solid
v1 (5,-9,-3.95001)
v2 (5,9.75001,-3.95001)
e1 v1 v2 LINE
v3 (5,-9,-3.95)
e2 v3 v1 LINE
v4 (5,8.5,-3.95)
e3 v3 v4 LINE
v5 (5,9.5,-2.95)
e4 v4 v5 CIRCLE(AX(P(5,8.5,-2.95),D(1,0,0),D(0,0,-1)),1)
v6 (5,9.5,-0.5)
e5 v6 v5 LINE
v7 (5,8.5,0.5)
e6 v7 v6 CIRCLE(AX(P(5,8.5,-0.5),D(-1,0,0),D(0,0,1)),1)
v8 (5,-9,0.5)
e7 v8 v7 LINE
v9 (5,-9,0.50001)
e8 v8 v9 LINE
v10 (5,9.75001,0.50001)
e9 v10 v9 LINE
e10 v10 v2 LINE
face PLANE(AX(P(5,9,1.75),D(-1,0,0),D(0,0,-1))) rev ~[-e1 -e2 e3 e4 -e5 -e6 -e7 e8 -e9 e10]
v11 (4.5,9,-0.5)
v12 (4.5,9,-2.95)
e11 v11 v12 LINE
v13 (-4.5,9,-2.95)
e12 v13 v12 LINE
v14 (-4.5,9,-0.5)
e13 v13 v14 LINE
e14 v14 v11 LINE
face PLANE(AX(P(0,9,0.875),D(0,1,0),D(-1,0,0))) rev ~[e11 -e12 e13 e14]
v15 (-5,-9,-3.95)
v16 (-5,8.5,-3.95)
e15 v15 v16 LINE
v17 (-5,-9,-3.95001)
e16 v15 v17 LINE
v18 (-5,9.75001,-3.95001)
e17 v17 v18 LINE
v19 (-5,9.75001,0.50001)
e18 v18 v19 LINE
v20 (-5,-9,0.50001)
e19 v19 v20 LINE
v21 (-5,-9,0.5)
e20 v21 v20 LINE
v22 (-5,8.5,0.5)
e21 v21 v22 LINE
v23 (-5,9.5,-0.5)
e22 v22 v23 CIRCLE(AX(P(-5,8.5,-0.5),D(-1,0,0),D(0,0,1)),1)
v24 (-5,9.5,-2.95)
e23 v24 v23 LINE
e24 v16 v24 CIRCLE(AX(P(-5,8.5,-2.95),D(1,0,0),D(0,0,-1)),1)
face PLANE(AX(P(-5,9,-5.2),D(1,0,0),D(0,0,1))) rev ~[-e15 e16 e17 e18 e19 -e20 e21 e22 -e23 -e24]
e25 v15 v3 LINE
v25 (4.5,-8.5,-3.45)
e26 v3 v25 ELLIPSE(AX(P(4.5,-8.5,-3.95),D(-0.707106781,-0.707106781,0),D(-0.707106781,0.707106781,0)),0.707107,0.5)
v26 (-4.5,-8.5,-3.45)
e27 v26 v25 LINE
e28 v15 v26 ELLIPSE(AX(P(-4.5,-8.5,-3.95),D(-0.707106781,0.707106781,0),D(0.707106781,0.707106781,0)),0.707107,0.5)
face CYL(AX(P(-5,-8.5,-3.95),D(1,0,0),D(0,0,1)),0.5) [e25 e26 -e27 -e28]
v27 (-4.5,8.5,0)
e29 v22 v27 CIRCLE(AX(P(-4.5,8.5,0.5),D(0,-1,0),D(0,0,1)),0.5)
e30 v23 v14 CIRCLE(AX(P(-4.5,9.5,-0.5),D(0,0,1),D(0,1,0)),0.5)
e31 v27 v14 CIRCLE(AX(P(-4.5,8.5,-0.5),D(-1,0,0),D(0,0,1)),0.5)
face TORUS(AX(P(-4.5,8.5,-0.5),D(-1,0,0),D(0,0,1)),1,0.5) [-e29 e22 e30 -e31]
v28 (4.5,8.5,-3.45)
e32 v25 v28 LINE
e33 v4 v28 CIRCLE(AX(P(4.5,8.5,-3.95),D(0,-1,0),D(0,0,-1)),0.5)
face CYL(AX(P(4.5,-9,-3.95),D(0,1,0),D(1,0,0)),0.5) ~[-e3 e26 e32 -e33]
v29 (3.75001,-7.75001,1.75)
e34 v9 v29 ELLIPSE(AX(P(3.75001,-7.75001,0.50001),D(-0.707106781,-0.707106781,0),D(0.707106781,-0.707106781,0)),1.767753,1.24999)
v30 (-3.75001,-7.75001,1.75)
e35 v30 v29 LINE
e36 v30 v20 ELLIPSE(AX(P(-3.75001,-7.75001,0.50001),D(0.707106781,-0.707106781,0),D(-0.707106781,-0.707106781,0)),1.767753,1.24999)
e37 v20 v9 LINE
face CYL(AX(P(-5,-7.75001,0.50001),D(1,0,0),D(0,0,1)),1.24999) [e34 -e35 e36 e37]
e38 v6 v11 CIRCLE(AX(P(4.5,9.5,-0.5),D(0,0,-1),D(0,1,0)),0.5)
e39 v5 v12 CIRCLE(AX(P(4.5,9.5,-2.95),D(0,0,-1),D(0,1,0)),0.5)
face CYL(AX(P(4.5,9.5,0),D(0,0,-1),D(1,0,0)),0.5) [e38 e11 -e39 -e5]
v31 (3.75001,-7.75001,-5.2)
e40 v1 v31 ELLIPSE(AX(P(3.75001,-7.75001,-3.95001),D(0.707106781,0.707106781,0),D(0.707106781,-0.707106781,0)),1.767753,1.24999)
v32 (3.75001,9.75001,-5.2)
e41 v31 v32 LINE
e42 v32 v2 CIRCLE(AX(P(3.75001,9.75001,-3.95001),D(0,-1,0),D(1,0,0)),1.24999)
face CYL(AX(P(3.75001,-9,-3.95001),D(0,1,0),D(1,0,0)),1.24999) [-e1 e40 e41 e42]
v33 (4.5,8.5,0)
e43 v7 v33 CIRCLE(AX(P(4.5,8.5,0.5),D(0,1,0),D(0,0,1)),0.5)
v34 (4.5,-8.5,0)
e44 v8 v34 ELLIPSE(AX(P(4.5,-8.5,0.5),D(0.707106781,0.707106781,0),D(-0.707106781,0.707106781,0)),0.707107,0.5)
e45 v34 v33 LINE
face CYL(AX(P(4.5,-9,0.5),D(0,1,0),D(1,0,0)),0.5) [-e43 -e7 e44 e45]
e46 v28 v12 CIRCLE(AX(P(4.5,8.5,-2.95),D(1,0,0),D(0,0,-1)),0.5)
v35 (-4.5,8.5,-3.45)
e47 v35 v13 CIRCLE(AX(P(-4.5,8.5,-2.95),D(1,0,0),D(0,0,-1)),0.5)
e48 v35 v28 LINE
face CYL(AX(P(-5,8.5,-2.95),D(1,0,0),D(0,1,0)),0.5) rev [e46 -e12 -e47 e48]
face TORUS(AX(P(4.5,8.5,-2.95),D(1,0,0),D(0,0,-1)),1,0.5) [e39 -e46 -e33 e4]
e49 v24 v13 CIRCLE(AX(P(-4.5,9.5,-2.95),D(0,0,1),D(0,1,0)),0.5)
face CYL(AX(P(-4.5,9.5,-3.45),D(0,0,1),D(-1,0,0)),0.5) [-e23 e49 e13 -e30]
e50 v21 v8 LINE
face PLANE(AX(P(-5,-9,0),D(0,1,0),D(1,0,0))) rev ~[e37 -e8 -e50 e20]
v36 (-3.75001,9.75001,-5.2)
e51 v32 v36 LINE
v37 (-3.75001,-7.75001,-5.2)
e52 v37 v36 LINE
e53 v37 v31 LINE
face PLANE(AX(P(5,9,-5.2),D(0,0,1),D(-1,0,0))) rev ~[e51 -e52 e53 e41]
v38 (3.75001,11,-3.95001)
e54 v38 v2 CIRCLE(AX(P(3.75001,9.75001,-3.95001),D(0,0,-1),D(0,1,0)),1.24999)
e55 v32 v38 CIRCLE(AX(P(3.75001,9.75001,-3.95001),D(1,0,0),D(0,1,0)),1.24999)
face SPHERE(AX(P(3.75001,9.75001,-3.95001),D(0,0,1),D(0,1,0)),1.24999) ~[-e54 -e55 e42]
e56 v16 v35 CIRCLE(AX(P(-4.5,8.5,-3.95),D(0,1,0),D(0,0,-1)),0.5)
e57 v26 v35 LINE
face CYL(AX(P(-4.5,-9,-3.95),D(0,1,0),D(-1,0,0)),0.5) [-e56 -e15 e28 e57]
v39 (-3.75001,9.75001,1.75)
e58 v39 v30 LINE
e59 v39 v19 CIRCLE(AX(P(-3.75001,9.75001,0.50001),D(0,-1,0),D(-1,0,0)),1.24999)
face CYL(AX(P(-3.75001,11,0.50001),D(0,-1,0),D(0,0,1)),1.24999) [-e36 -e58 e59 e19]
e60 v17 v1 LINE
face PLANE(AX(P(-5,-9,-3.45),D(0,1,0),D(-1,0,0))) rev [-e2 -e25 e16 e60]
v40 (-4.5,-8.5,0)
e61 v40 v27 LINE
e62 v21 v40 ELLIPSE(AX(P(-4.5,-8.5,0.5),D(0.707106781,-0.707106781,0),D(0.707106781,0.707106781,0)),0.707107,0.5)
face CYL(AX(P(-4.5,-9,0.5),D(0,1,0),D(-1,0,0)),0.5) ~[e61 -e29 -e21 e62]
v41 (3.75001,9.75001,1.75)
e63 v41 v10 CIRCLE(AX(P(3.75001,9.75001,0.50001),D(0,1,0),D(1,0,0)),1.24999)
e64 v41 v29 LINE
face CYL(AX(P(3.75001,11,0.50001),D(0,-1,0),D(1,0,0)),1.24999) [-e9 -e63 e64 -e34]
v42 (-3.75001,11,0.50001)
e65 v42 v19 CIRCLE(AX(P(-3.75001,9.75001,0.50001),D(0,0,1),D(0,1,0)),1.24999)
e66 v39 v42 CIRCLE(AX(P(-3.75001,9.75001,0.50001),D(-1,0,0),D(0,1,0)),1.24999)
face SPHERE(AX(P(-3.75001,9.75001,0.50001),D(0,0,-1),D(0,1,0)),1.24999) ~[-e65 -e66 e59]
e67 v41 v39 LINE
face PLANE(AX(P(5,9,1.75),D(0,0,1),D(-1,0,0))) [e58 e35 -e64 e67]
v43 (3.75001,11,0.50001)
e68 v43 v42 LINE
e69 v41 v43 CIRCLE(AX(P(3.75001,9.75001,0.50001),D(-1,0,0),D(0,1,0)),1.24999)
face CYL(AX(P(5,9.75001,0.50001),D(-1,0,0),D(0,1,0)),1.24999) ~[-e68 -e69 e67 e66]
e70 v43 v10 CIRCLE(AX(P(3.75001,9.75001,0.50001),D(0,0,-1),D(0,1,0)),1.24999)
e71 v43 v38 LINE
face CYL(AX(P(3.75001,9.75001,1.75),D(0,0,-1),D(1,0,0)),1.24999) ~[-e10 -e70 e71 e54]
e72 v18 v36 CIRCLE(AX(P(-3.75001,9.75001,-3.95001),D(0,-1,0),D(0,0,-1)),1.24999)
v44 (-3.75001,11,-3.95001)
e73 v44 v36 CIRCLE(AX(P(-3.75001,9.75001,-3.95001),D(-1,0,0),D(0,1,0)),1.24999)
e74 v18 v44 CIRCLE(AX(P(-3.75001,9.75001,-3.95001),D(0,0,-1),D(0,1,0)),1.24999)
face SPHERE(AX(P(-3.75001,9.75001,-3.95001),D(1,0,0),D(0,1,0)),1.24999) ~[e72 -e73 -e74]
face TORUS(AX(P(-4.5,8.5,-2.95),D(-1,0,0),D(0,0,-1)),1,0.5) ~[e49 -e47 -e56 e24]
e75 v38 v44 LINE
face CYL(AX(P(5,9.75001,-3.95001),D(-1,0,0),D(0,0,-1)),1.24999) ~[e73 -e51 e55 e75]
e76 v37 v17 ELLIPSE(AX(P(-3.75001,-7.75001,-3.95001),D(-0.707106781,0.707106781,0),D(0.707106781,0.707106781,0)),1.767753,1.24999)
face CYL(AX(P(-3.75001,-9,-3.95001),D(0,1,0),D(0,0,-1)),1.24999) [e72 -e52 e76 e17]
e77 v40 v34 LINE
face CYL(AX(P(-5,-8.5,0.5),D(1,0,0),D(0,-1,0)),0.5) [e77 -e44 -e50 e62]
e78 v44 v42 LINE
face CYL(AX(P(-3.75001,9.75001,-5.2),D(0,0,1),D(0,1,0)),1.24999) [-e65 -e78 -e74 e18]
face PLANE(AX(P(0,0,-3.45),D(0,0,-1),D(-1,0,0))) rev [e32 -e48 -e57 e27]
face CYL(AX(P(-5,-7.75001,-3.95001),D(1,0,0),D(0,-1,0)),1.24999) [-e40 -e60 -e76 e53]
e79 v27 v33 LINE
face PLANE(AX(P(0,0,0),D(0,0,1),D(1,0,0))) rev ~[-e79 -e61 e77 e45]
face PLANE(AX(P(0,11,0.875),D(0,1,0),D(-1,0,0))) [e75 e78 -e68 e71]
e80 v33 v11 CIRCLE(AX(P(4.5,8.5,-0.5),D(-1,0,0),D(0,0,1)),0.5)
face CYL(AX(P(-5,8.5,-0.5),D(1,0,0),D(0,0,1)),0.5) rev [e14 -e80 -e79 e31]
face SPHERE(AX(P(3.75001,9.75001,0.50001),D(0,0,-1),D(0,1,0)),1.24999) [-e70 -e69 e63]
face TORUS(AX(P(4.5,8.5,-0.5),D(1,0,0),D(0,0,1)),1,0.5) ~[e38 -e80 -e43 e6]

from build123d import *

# Parameters (mm, degrees)
F0_W     = 10
F0_H     = 18
F1_DEPTH = 1.75
F2_W     = 10
F2_H     = 1.75
F2_H_2   = 5.2
F3_DEPTH = 2
F8_R     = 0.5
F9_R     = 1.24999


# Not quite as in the source:
# - a fillet or chamfer is up to 0.001 mm smaller than in the source, because OpenCascade refuses the exact size


with BuildPart() as f1:
    # F0 (on Top) → F1 (new body)
    with BuildSketch(Plane.XY):
        Rectangle(F0_W, F0_H)
    extrude(amount=F1_DEPTH)

    # F2 (on face) → F3 (join)
    with BuildSketch(Plane(origin=(0, 9, 0), x_dir=(-1, 0, 0), z_dir=(0, 1, 0))):
        with Locations((0, 0.875)):
            Rectangle(F2_W, F2_H)
        with Locations((0, -2.6)):
            Rectangle(F2_W, F2_H_2)
    extrude(amount=F3_DEPTH)

    # F7: F1 across plane


with BuildPart() as f1_1:
    add(f1.part)
    add(f1.part.mirror(Plane(origin=(-5, 1.2789499015, -1.725), x_dir=(0.9979743188, 0.063618071, 0), z_dir=(0, 0, -1))))

    # F8
    f8_edges = [f1_1.edges().sort_by_distance(p)[0] for p in [
        (0, 9, 0),
        (0, 9, -3.45),
        (5, 0, -3.45),
        (-5, 0, -3.45),
        (0, -9, -3.45),
        (5, 0, 0),
        (-5, 0, 0),
        (0, -9, 0),
        (5, 9, -1.725),
        (-5, 9, -1.725),
    ]]
    fillet(f8_edges, radius=F8_R)

    # F9 (radius 1.25 in the source; OpenCascade refuses exactly that, so slightly less here)
    f9_edges = [f1_1.edges().sort_by_distance(p)[0] for p in [
        (5, 11, -1.725),
        (0, 11, -5.2),
        (-5, 11, -1.725),
        (0, 11, 1.75),
        (5, 1, 1.75),
        (-5, 1, 1.75),
        (0, -9, 1.75),
        (-5, 1, -5.2),
        (0, -9, -5.2),
        (5, 1, -5.2),
    ]]
    fillet(f9_edges, radius=F9_R)


solid = f1_1.part
